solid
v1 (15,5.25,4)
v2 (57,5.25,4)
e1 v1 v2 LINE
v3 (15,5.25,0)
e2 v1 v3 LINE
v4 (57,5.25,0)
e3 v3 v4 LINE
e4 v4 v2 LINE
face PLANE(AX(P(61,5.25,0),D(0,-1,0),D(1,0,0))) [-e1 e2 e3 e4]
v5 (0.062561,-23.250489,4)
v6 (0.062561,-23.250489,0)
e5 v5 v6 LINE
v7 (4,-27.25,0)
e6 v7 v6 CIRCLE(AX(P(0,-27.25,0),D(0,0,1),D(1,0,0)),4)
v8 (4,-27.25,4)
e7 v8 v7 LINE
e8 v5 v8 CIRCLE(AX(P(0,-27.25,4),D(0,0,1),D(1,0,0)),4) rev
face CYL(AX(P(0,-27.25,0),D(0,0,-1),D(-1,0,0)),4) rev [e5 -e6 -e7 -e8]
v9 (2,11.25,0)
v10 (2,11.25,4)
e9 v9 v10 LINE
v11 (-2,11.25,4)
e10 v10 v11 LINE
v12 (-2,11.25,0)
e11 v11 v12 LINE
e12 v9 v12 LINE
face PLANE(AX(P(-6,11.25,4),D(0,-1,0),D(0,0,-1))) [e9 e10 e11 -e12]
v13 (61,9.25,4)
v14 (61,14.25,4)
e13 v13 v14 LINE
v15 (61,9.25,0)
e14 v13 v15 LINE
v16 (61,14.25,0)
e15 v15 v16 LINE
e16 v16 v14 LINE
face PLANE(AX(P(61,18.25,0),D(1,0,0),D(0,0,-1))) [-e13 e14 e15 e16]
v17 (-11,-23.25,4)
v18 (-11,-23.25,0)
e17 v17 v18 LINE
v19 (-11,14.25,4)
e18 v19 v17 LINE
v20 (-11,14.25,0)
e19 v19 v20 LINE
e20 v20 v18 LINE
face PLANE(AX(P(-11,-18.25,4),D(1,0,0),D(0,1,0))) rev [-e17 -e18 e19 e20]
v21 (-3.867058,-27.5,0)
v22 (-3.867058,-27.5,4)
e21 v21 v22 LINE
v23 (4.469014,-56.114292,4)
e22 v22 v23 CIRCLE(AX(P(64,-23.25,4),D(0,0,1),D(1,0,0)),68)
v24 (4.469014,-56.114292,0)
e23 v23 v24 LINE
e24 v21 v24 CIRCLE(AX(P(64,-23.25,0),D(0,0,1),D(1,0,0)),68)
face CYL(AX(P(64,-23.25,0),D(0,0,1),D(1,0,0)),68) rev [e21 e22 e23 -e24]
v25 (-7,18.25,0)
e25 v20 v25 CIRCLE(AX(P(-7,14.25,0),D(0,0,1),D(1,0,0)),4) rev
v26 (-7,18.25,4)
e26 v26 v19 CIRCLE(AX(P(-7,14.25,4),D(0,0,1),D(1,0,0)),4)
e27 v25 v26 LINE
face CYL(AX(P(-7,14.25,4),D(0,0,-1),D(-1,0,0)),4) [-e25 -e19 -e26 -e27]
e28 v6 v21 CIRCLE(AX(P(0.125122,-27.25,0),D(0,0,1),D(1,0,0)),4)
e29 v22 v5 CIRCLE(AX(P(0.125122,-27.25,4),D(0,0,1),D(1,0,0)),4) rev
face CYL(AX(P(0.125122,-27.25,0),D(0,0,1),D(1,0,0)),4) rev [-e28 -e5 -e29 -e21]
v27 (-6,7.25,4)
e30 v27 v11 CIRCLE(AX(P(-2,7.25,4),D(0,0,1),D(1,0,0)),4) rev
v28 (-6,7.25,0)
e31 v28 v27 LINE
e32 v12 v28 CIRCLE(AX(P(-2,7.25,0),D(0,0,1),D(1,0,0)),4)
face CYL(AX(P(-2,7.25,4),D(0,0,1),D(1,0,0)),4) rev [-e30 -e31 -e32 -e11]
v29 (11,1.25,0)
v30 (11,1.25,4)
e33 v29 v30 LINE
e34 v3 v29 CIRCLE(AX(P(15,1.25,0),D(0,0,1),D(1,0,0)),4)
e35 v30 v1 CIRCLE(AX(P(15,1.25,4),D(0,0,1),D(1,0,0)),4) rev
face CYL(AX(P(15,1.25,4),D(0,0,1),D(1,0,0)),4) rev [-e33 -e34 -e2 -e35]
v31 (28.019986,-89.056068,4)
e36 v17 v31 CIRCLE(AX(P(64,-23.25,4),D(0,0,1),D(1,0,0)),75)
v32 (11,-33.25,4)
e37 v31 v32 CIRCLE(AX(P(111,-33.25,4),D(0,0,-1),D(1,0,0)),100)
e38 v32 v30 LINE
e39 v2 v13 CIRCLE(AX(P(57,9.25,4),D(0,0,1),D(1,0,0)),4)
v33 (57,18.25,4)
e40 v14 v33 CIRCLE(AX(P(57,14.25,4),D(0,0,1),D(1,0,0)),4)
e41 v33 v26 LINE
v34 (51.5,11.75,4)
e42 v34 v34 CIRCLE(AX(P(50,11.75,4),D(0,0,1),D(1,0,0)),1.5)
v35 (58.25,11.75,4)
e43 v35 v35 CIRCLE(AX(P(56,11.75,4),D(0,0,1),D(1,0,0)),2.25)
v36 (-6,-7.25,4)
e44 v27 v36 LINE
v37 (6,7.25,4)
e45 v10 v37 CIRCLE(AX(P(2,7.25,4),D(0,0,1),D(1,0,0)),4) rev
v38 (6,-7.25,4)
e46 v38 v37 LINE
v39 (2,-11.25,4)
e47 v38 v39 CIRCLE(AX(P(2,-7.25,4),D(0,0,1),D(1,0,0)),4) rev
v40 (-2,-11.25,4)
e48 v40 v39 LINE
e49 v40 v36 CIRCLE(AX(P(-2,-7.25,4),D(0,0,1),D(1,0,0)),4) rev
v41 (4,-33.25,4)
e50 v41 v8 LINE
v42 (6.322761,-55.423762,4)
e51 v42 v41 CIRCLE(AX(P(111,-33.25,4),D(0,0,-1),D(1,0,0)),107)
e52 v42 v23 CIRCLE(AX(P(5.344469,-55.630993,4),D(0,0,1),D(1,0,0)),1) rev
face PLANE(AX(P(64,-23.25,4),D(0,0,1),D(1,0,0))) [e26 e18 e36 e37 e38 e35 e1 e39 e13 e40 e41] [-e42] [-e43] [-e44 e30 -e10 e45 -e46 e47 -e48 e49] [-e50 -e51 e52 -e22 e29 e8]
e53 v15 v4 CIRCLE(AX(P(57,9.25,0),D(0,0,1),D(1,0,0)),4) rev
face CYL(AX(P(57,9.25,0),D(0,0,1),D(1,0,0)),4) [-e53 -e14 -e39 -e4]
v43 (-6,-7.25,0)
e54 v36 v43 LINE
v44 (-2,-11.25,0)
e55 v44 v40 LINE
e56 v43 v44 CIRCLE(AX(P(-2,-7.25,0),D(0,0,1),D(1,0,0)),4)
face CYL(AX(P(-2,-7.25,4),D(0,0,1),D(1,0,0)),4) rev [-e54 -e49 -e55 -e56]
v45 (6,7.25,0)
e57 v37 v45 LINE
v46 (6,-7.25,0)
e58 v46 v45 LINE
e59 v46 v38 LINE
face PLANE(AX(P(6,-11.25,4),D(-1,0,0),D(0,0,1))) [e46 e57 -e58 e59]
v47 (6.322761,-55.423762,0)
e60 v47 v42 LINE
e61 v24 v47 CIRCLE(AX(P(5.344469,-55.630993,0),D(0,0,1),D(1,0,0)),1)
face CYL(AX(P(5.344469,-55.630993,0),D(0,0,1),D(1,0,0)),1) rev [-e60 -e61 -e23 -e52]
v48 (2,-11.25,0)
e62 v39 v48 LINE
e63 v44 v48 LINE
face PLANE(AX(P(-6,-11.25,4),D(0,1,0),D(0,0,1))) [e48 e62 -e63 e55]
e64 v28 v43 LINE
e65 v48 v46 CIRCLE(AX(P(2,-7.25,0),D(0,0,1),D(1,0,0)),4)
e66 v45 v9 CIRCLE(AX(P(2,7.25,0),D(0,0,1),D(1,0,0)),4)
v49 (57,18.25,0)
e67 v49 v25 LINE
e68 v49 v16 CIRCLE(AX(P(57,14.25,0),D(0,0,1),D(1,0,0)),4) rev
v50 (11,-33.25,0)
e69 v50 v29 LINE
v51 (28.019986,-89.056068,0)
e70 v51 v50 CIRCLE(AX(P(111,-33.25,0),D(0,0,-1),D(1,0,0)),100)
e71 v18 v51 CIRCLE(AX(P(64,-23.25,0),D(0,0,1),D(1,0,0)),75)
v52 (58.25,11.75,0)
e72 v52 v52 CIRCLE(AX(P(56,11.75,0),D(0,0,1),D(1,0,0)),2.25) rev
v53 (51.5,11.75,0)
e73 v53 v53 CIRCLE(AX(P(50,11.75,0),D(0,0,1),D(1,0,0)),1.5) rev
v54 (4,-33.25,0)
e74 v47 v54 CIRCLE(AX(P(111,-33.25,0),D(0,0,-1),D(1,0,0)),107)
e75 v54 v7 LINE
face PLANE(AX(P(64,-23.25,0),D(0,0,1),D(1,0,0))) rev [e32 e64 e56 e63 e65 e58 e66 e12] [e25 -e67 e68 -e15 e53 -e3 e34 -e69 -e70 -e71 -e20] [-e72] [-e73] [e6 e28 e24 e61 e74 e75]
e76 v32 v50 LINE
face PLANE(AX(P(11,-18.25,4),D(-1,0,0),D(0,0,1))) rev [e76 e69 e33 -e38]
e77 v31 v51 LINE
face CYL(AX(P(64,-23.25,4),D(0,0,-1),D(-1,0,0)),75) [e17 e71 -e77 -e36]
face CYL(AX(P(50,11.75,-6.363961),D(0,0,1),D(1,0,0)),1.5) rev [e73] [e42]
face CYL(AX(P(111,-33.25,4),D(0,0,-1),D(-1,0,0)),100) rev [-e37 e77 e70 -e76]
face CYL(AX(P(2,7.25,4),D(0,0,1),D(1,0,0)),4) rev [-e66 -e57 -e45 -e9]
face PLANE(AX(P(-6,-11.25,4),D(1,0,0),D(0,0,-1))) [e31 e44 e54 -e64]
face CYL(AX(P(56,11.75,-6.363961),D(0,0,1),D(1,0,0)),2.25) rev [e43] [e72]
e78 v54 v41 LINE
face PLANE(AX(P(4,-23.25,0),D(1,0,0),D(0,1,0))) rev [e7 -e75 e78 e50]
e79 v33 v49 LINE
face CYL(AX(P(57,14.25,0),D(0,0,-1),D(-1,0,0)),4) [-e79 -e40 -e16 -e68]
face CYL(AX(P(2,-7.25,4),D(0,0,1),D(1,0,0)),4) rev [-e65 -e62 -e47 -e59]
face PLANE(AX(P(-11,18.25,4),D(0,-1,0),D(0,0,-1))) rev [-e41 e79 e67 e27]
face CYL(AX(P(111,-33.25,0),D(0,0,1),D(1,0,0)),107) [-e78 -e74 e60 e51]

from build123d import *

# Parameters (mm, degrees)
ESQUISSE1_W             = 12
ESQUISSE1_H             = 22.5
BOSS_EXTRU_1_DEPTH      = 4
ENL_V_MAT_EXTRU_1_DEPTH = 94.445721179
SKETCH1_W               = 50
SKETCH1_H               = 13
BOSS_EXTRUDE1_DEPTH     = 4
SKETCH2_R               = 2.25
SKETCH2_R_2             = 1.5
CUT_EXTRUDE1_DEPTH      = 4
FILLET1_R               = 4
FILLET2_R               = 1


with BuildPart() as part:
    # Esquisse1 → Boss.-Extru.1 (new body)
    with BuildSketch(Plane.XY):
        with BuildLine():
            Line((-11, -18.25), (-11, 18.25))
            Line((-11, 18.25), (11, 18.25))
            Line((11, 18.25), (11, -18.25))
            Line((11, -18.25), (11, -33.25))
            ThreePointArc((11, -33.25), (15.349591107, -62.421891926), (28.019985571, -89.056067818))
            ThreePointArc((28.019985571, -89.056067818), (-0.511631053, -61.502443829), (-11, -23.25))
            Line((-11, -23.25), (-11, -18.25))
        make_face()
        Rectangle(ESQUISSE1_W, ESQUISSE1_H, mode=Mode.SUBTRACT)
    extrude(amount=BOSS_EXTRU_1_DEPTH)

    # Esquisse2 → Enlèv. mat.-Extru.1 (cut, through all)
    with BuildSketch(Plane.XY.offset(4)):
        with BuildLine():
            Line((-4, -23.25), (4, -23.25))
            Line((4, -23.25), (4, -33.25))
            ThreePointArc((4, -33.25), (4.956601419, -47.525770288), (7.809301258, -61.546284087))
            ThreePointArc((7.809301258, -61.546284087), (-0.980641404, -43.287870216), (-4, -23.25))
        make_face()
    extrude(amount=-ENL_V_MAT_EXTRU_1_DEPTH, mode=Mode.SUBTRACT)

    # Sketch1 → Boss-Extrude1 (add)
    with BuildSketch(Plane.XY.offset(4)):
        with Locations((36, 11.75)):
            Rectangle(SKETCH1_W, SKETCH1_H)
    extrude(amount=-BOSS_EXTRUDE1_DEPTH)

    # Sketch2 → Cut-Extrude1 (cut)
    with BuildSketch(Plane.XY.offset(4)):
        with Locations((56, 11.75)):
            Circle(SKETCH2_R)
        with Locations((50, 11.75)):
            Circle(SKETCH2_R_2)
    extrude(amount=-CUT_EXTRUDE1_DEPTH, mode=Mode.SUBTRACT)

    # Fillet1
    # the kernel refuses this fillet: 4 mm, written as the material it adds along each edge
    with BuildSketch(Plane(origin=(11, 5.25, 4), x_dir=(0, -1, 0), z_dir=(0, 0, -1)), Plane(origin=(4, -23.25, 4), x_dir=(-1, 0, 0), z_dir=(0, 0, -1)), Plane(origin=(6, -11.25, 0), x_dir=(-1, 0, 0), z_dir=(0, 0, 1)), Plane(origin=(6, 11.25, 0), x_dir=(0, -1, 0), z_dir=(0, 0, 1))) as fillet1_piece_1:
        with BuildLine():
            CenterArc((FILLET1_R, -FILLET1_R), FILLET1_R, 90, 90)
            Line((0, -FILLET1_R), (0, 0))
            Line((0, 0), (FILLET1_R, 0))
        make_face()
    extrude(amount=4)
    with BuildSketch(Plane(origin=(-4, -23.25, 4), x_dir=(1, 0, 0), z_dir=(0, 0, -1))) as fillet1_piece_2:
        with BuildLine():
            CenterArc((4.125122309, 4), FILLET1_R, 176.416678302, 93.583321698)
            ThreePointArc((0.132942454, 4.25), (0.033243739, 2.126039375), (0, 0))
            Line((0, 0), (4.125122309, 0))
        make_face()
    extrude(amount=4)
    with BuildSketch(Plane(origin=(-6, -11.25, 0), x_dir=(1, 0, 0), z_dir=(0, 0, 1)), Plane(origin=(-6, 11.25, 0), x_dir=(0, -1, 0), z_dir=(0, 0, 1))) as fillet1_piece_3:
        with BuildLine():
            CenterArc((FILLET1_R, FILLET1_R), FILLET1_R, 180, 90)
            Line((0, FILLET1_R), (0, 0))
            Line((0, 0), (FILLET1_R, 0))
        make_face()
    extrude(amount=4)
    # the kernel refuses this fillet: 4 mm, written as the material it takes off along each edge
    with BuildSketch(Plane(origin=(-11, 18.25, -10), x_dir=(0, -1, 0), z_dir=(0, 0, 1))) as fillet1_2_piece_1:
        with BuildLine():
            CenterArc((FILLET1_R, FILLET1_R), FILLET1_R, 180, 90)
            Line((0, FILLET1_R), (0, 0))
            Line((0, 0), (FILLET1_R, 0))
        make_face()
    extrude(amount=24, mode=Mode.SUBTRACT)
    with BuildSketch(Plane(origin=(61, 5.25, 14), x_dir=(0, 1, 0), z_dir=(0, 0, -1)), Plane(origin=(61, 18.25, 14), x_dir=(-1, 0, 0), z_dir=(0, 0, -1))) as fillet1_2_piece_2:
        with BuildLine():
            CenterArc((FILLET1_R, -FILLET1_R), FILLET1_R, 90, 90)
            Line((0, -FILLET1_R), (0, 0))
            Line((0, 0), (FILLET1_R, 0))
        make_face()
    extrude(amount=24, mode=Mode.SUBTRACT)

    # Fillet2
    fillet2_edges = [part.edges().sort_by_distance(p)[0] for p in [
        (7.809301258, -61.546284087, 2),
    ]]
    fillet(fillet2_edges, radius=FILLET2_R)


solid = part.part
